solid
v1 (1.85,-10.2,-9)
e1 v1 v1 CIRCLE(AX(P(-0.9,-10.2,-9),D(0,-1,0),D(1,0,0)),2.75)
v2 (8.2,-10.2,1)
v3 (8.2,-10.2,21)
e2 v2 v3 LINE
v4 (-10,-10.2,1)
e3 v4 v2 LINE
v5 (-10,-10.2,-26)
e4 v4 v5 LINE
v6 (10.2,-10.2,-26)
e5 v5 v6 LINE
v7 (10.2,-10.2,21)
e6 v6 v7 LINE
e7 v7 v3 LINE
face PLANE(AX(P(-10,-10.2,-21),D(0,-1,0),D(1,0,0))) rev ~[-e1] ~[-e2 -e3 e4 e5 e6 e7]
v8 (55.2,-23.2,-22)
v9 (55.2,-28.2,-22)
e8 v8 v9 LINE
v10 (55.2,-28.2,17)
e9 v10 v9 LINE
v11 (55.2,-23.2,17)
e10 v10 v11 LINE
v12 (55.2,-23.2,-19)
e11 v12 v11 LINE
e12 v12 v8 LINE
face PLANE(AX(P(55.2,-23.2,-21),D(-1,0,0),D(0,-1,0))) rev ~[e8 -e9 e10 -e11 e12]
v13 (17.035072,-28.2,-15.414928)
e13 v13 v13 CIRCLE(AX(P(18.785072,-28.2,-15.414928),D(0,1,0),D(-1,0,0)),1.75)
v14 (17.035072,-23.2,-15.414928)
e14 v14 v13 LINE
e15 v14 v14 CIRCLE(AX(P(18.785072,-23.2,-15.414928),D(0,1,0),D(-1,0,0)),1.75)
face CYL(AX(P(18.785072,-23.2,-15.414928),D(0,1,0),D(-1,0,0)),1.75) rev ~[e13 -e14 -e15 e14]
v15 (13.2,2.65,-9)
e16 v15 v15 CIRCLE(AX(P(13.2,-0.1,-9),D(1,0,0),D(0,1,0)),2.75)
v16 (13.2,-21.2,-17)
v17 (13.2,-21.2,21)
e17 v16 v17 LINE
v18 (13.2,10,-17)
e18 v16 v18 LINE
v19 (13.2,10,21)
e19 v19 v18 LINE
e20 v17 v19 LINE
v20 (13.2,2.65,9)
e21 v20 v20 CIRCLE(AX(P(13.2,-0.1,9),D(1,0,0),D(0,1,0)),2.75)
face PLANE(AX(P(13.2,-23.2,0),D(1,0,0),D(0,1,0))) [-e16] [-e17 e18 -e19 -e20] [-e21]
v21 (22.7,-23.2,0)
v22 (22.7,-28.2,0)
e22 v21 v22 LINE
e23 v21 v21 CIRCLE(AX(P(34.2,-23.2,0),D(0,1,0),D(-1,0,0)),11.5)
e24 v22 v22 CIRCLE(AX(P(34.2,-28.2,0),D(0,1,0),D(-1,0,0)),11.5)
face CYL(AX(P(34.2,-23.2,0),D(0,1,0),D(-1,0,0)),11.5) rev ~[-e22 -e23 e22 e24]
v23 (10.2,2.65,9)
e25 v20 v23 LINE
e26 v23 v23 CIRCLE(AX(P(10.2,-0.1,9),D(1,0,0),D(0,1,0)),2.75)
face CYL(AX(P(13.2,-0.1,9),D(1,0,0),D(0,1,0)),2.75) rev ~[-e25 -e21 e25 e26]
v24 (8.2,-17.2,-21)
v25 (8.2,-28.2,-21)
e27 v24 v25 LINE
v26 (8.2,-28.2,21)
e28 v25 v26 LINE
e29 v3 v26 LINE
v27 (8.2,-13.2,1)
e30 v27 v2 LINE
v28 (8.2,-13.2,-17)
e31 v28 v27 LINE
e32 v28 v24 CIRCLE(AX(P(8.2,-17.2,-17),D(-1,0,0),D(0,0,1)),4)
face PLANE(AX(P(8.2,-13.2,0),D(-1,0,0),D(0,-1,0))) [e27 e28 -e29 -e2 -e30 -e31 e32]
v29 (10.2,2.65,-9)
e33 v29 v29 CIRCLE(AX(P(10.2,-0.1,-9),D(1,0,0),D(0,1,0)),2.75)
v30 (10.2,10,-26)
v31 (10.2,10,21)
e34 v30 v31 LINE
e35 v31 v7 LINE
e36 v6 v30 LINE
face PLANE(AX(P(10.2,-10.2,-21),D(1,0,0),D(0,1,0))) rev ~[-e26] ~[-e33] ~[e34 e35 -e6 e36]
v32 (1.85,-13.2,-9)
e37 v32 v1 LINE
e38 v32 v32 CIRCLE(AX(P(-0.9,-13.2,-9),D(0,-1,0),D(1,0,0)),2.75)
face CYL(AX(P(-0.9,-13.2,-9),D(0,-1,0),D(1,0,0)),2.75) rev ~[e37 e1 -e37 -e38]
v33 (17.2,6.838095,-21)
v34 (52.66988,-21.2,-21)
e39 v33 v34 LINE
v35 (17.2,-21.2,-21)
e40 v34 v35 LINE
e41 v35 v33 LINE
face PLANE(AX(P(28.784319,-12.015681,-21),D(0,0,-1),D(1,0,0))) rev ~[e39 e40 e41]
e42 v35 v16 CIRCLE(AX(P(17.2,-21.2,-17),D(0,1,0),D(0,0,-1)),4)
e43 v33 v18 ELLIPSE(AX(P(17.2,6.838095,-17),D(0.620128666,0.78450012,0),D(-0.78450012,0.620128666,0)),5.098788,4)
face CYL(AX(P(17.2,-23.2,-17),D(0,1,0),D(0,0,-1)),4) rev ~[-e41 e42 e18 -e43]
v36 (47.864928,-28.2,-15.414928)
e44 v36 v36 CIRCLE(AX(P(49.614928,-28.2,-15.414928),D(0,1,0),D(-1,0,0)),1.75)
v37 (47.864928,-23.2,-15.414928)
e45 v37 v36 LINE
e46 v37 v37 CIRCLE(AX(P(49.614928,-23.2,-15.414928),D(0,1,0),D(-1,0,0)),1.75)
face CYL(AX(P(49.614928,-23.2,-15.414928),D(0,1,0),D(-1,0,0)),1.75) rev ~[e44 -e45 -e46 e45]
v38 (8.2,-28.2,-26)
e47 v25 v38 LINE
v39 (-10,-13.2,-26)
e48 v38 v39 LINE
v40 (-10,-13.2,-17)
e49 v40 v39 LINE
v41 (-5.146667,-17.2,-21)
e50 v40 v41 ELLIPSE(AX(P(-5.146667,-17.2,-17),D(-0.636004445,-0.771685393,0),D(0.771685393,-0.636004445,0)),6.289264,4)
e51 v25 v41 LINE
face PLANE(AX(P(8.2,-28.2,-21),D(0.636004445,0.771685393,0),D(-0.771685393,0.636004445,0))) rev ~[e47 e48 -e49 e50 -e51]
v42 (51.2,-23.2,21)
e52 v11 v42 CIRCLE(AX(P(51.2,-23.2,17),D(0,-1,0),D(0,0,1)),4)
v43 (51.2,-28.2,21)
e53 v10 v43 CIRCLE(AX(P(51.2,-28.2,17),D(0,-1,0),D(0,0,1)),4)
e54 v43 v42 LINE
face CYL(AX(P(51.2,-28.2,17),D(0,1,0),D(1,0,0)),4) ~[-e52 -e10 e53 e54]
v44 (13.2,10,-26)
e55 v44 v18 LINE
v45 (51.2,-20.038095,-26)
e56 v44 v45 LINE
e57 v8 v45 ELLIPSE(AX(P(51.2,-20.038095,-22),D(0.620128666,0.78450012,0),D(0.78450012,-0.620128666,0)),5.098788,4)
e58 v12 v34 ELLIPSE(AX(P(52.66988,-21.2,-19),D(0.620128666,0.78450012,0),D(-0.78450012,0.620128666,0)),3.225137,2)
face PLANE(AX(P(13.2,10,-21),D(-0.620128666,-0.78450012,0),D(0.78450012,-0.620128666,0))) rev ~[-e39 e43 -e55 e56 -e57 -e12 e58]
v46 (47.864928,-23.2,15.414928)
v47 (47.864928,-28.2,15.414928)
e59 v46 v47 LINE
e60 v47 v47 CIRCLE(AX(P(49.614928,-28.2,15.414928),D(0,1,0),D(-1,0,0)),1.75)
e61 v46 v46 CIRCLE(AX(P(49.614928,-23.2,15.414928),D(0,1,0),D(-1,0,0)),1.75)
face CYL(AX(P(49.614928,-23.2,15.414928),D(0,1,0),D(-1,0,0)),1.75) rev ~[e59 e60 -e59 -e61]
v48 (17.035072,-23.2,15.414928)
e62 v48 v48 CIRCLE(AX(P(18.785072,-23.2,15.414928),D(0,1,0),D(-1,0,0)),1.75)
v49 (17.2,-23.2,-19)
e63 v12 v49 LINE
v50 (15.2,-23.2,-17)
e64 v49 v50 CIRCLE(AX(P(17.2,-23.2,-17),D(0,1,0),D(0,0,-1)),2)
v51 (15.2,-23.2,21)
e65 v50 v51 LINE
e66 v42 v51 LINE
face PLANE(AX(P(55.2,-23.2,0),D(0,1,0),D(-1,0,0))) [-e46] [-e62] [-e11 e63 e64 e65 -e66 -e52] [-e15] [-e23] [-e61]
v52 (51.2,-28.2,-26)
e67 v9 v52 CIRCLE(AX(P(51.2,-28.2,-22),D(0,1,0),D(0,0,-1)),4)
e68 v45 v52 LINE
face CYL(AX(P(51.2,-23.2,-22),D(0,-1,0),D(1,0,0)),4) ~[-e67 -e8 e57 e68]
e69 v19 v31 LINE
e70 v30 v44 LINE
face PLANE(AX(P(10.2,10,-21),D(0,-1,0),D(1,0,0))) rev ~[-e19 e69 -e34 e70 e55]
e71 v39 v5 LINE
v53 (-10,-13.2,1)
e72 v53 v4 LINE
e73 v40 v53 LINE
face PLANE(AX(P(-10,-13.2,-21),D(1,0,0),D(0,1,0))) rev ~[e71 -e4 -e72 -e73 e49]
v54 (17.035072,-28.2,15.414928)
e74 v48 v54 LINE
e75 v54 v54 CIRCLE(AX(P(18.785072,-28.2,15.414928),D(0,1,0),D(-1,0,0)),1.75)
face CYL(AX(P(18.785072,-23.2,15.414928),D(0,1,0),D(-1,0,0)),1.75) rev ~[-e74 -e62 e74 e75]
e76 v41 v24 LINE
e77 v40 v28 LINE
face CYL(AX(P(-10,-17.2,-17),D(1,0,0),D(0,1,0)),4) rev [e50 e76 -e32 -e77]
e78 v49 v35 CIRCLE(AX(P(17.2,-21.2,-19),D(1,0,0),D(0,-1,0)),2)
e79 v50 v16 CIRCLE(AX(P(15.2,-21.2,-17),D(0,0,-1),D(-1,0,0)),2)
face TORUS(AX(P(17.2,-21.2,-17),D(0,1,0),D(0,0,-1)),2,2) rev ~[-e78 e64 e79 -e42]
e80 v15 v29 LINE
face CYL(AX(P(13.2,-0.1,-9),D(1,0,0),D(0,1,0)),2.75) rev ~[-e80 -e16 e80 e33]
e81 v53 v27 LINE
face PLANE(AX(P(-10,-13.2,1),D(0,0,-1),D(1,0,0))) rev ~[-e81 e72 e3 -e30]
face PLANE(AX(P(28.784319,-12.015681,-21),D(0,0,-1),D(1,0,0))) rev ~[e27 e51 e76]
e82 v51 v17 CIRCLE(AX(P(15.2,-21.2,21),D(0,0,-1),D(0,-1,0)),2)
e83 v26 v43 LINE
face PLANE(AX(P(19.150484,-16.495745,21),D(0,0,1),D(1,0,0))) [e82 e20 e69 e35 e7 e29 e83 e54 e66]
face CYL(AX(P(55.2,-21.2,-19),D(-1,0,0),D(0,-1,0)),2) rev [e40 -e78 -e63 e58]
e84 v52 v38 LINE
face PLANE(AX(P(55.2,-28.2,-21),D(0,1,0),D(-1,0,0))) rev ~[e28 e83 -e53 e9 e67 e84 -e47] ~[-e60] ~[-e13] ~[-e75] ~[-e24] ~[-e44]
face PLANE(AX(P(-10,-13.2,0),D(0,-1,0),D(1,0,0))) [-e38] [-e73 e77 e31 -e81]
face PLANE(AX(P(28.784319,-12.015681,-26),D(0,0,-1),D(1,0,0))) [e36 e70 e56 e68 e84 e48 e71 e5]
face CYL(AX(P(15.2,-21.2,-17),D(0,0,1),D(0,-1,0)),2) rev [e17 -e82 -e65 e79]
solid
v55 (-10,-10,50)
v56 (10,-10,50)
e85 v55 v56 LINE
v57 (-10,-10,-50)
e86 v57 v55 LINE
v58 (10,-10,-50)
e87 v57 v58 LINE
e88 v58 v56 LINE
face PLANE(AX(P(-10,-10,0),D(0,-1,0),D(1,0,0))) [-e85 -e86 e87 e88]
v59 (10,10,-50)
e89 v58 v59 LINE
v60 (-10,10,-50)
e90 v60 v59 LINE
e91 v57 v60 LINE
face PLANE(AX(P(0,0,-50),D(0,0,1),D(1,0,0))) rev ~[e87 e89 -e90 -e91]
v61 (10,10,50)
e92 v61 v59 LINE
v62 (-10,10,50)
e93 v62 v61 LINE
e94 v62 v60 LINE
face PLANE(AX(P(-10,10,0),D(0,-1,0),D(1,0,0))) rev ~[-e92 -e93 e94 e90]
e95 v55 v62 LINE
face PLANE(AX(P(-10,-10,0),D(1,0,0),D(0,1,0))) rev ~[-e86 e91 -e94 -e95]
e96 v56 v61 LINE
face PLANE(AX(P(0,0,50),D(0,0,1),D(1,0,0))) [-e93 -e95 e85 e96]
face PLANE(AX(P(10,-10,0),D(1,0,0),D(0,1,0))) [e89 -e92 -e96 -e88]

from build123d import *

# Parameters (mm, degrees)
F0_W      = 20
F0_H      = 20
F1_DEPTH  = 50
F3_DEPTH  = 21
F4_R      = 11.5
F4_R_2    = 1.75
F5_DEPTH  = 5.001
F7_DEPTH  = 5
F8_R      = 2.75
F9_DEPTH  = 3
F10_R     = 2.75
F11_DEPTH = 3
F12_R     = 4
F13_R     = 2
F14_W     = 18.2
F14_H     = 20
F14_R     = 2.75
F15_DEPTH = 25


# Not quite as in the source:
# - a feature names something its author has since deleted; it is built from what else it names


with BuildPart() as f1:
    # F0 (on Top) → F1 (new body, symmetric)
    with BuildSketch(Plane.XY):
        Rectangle(F0_W, F0_H)
    extrude(amount=F1_DEPTH, both=True)


with BuildPart() as f3:
    # F2 (on Top) → F3 (new body, symmetric)
    with BuildSketch(Plane.XY):
        Polygon((10.2, 10), (10.2, -10.2), (-10, -10.2), (-10, -13.2), (8.2, -13.2), (8.2, -28.2), (55.2, -28.2), (55.2, -23.2), (13.2, -23.2), (13.2, 10), align=None)
    extrude(amount=F3_DEPTH, both=True)

    # F4 (on face) → F5 (cut, through all)
    with BuildSketch(Plane(origin=(0, -23.2, 0), x_dir=(-1, 0, 0), z_dir=(0, 1, 0))):
        with Locations((-34.2, 0)):
            Circle(F4_R)
        with Locations((-49.6149278299, 15.4149278299)):
            Circle(F4_R_2)
        with Locations((-18.7850721701, 15.4149278299)):
            Circle(F4_R_2)
        with Locations((-18.7850721701, -15.4149278299)):
            Circle(F4_R_2)
        with Locations((-49.6149278299, -15.4149278299)):
            Circle(F4_R_2)
    extrude(amount=-F5_DEPTH, mode=Mode.SUBTRACT)

    # F6 (on face) → F7 (join)
    with BuildSketch(Plane(origin=(0, 0, -21), x_dir=(1, 0, 0), z_dir=(0, 0, -1))):
        Polygon((13.2, 23.2), (13.2, -10), (55.2, 23.2), align=None)
        Polygon((10.2, -10), (13.2, -10), (13.2, 23.2), (55.2, 23.2), (55.2, 28.2), (8.2, 28.2), (8.2, 13.2), (-10, 13.2), (-10, 10.2), (10.2, 10.2), align=None)
        Polygon((8.2, 13.2), (8.2, 28.2), (-10, 13.2), align=None)
    extrude(amount=F7_DEPTH)

    # F8 (on face) → F9 (cut, through all)
    with BuildSketch(Plane.XZ.offset(13.2)):
        with Locations((-0.9, 9)):
            Circle(F8_R)
        with Locations((-0.9, -9)):
            Circle(F8_R)
    extrude(amount=-F9_DEPTH, mode=Mode.SUBTRACT)

    # F10 (on face) → F11 (cut, through all)
    with BuildSketch(Plane.YZ.offset(13.2)):
        with Locations((-0.1, 9)):
            Circle(F10_R)
        with Locations((-0.1, -9)):
            Circle(F10_R)
    extrude(amount=-F11_DEPTH, mode=Mode.SUBTRACT)

    # F12
    f12_edges = [f3.edges().sort_by_distance(p)[0] for p in [
        (13.2, -6.6, -21),
        (-0.9, -13.2, -21),
        (55.2, -25.7, 21),
        (55.2, -25.7, -26),
    ]]
    fillet(f12_edges, radius=F12_R)

    # F13
    f13_edges = [f3.edges().sort_by_distance(p)[0] for p in [
        (36.2, -23.2, -21),
        (13.2, -23.2, 2),
        (14.371573, -23.2, -19.828427),
    ]]
    fillet(f13_edges, radius=F13_R)

    # F14 (on face) → F15 (cut)
    with BuildSketch(Plane.XZ.offset(13.2)):
        with Locations((-0.9, 11)):
            Rectangle(F14_W, F14_H)
        with Locations((-0.9, 9)):
            Circle(F14_R, mode=Mode.SUBTRACT)
    extrude(amount=-F15_DEPTH, mode=Mode.SUBTRACT)


solid = Compound([f1.part, f3.part])
